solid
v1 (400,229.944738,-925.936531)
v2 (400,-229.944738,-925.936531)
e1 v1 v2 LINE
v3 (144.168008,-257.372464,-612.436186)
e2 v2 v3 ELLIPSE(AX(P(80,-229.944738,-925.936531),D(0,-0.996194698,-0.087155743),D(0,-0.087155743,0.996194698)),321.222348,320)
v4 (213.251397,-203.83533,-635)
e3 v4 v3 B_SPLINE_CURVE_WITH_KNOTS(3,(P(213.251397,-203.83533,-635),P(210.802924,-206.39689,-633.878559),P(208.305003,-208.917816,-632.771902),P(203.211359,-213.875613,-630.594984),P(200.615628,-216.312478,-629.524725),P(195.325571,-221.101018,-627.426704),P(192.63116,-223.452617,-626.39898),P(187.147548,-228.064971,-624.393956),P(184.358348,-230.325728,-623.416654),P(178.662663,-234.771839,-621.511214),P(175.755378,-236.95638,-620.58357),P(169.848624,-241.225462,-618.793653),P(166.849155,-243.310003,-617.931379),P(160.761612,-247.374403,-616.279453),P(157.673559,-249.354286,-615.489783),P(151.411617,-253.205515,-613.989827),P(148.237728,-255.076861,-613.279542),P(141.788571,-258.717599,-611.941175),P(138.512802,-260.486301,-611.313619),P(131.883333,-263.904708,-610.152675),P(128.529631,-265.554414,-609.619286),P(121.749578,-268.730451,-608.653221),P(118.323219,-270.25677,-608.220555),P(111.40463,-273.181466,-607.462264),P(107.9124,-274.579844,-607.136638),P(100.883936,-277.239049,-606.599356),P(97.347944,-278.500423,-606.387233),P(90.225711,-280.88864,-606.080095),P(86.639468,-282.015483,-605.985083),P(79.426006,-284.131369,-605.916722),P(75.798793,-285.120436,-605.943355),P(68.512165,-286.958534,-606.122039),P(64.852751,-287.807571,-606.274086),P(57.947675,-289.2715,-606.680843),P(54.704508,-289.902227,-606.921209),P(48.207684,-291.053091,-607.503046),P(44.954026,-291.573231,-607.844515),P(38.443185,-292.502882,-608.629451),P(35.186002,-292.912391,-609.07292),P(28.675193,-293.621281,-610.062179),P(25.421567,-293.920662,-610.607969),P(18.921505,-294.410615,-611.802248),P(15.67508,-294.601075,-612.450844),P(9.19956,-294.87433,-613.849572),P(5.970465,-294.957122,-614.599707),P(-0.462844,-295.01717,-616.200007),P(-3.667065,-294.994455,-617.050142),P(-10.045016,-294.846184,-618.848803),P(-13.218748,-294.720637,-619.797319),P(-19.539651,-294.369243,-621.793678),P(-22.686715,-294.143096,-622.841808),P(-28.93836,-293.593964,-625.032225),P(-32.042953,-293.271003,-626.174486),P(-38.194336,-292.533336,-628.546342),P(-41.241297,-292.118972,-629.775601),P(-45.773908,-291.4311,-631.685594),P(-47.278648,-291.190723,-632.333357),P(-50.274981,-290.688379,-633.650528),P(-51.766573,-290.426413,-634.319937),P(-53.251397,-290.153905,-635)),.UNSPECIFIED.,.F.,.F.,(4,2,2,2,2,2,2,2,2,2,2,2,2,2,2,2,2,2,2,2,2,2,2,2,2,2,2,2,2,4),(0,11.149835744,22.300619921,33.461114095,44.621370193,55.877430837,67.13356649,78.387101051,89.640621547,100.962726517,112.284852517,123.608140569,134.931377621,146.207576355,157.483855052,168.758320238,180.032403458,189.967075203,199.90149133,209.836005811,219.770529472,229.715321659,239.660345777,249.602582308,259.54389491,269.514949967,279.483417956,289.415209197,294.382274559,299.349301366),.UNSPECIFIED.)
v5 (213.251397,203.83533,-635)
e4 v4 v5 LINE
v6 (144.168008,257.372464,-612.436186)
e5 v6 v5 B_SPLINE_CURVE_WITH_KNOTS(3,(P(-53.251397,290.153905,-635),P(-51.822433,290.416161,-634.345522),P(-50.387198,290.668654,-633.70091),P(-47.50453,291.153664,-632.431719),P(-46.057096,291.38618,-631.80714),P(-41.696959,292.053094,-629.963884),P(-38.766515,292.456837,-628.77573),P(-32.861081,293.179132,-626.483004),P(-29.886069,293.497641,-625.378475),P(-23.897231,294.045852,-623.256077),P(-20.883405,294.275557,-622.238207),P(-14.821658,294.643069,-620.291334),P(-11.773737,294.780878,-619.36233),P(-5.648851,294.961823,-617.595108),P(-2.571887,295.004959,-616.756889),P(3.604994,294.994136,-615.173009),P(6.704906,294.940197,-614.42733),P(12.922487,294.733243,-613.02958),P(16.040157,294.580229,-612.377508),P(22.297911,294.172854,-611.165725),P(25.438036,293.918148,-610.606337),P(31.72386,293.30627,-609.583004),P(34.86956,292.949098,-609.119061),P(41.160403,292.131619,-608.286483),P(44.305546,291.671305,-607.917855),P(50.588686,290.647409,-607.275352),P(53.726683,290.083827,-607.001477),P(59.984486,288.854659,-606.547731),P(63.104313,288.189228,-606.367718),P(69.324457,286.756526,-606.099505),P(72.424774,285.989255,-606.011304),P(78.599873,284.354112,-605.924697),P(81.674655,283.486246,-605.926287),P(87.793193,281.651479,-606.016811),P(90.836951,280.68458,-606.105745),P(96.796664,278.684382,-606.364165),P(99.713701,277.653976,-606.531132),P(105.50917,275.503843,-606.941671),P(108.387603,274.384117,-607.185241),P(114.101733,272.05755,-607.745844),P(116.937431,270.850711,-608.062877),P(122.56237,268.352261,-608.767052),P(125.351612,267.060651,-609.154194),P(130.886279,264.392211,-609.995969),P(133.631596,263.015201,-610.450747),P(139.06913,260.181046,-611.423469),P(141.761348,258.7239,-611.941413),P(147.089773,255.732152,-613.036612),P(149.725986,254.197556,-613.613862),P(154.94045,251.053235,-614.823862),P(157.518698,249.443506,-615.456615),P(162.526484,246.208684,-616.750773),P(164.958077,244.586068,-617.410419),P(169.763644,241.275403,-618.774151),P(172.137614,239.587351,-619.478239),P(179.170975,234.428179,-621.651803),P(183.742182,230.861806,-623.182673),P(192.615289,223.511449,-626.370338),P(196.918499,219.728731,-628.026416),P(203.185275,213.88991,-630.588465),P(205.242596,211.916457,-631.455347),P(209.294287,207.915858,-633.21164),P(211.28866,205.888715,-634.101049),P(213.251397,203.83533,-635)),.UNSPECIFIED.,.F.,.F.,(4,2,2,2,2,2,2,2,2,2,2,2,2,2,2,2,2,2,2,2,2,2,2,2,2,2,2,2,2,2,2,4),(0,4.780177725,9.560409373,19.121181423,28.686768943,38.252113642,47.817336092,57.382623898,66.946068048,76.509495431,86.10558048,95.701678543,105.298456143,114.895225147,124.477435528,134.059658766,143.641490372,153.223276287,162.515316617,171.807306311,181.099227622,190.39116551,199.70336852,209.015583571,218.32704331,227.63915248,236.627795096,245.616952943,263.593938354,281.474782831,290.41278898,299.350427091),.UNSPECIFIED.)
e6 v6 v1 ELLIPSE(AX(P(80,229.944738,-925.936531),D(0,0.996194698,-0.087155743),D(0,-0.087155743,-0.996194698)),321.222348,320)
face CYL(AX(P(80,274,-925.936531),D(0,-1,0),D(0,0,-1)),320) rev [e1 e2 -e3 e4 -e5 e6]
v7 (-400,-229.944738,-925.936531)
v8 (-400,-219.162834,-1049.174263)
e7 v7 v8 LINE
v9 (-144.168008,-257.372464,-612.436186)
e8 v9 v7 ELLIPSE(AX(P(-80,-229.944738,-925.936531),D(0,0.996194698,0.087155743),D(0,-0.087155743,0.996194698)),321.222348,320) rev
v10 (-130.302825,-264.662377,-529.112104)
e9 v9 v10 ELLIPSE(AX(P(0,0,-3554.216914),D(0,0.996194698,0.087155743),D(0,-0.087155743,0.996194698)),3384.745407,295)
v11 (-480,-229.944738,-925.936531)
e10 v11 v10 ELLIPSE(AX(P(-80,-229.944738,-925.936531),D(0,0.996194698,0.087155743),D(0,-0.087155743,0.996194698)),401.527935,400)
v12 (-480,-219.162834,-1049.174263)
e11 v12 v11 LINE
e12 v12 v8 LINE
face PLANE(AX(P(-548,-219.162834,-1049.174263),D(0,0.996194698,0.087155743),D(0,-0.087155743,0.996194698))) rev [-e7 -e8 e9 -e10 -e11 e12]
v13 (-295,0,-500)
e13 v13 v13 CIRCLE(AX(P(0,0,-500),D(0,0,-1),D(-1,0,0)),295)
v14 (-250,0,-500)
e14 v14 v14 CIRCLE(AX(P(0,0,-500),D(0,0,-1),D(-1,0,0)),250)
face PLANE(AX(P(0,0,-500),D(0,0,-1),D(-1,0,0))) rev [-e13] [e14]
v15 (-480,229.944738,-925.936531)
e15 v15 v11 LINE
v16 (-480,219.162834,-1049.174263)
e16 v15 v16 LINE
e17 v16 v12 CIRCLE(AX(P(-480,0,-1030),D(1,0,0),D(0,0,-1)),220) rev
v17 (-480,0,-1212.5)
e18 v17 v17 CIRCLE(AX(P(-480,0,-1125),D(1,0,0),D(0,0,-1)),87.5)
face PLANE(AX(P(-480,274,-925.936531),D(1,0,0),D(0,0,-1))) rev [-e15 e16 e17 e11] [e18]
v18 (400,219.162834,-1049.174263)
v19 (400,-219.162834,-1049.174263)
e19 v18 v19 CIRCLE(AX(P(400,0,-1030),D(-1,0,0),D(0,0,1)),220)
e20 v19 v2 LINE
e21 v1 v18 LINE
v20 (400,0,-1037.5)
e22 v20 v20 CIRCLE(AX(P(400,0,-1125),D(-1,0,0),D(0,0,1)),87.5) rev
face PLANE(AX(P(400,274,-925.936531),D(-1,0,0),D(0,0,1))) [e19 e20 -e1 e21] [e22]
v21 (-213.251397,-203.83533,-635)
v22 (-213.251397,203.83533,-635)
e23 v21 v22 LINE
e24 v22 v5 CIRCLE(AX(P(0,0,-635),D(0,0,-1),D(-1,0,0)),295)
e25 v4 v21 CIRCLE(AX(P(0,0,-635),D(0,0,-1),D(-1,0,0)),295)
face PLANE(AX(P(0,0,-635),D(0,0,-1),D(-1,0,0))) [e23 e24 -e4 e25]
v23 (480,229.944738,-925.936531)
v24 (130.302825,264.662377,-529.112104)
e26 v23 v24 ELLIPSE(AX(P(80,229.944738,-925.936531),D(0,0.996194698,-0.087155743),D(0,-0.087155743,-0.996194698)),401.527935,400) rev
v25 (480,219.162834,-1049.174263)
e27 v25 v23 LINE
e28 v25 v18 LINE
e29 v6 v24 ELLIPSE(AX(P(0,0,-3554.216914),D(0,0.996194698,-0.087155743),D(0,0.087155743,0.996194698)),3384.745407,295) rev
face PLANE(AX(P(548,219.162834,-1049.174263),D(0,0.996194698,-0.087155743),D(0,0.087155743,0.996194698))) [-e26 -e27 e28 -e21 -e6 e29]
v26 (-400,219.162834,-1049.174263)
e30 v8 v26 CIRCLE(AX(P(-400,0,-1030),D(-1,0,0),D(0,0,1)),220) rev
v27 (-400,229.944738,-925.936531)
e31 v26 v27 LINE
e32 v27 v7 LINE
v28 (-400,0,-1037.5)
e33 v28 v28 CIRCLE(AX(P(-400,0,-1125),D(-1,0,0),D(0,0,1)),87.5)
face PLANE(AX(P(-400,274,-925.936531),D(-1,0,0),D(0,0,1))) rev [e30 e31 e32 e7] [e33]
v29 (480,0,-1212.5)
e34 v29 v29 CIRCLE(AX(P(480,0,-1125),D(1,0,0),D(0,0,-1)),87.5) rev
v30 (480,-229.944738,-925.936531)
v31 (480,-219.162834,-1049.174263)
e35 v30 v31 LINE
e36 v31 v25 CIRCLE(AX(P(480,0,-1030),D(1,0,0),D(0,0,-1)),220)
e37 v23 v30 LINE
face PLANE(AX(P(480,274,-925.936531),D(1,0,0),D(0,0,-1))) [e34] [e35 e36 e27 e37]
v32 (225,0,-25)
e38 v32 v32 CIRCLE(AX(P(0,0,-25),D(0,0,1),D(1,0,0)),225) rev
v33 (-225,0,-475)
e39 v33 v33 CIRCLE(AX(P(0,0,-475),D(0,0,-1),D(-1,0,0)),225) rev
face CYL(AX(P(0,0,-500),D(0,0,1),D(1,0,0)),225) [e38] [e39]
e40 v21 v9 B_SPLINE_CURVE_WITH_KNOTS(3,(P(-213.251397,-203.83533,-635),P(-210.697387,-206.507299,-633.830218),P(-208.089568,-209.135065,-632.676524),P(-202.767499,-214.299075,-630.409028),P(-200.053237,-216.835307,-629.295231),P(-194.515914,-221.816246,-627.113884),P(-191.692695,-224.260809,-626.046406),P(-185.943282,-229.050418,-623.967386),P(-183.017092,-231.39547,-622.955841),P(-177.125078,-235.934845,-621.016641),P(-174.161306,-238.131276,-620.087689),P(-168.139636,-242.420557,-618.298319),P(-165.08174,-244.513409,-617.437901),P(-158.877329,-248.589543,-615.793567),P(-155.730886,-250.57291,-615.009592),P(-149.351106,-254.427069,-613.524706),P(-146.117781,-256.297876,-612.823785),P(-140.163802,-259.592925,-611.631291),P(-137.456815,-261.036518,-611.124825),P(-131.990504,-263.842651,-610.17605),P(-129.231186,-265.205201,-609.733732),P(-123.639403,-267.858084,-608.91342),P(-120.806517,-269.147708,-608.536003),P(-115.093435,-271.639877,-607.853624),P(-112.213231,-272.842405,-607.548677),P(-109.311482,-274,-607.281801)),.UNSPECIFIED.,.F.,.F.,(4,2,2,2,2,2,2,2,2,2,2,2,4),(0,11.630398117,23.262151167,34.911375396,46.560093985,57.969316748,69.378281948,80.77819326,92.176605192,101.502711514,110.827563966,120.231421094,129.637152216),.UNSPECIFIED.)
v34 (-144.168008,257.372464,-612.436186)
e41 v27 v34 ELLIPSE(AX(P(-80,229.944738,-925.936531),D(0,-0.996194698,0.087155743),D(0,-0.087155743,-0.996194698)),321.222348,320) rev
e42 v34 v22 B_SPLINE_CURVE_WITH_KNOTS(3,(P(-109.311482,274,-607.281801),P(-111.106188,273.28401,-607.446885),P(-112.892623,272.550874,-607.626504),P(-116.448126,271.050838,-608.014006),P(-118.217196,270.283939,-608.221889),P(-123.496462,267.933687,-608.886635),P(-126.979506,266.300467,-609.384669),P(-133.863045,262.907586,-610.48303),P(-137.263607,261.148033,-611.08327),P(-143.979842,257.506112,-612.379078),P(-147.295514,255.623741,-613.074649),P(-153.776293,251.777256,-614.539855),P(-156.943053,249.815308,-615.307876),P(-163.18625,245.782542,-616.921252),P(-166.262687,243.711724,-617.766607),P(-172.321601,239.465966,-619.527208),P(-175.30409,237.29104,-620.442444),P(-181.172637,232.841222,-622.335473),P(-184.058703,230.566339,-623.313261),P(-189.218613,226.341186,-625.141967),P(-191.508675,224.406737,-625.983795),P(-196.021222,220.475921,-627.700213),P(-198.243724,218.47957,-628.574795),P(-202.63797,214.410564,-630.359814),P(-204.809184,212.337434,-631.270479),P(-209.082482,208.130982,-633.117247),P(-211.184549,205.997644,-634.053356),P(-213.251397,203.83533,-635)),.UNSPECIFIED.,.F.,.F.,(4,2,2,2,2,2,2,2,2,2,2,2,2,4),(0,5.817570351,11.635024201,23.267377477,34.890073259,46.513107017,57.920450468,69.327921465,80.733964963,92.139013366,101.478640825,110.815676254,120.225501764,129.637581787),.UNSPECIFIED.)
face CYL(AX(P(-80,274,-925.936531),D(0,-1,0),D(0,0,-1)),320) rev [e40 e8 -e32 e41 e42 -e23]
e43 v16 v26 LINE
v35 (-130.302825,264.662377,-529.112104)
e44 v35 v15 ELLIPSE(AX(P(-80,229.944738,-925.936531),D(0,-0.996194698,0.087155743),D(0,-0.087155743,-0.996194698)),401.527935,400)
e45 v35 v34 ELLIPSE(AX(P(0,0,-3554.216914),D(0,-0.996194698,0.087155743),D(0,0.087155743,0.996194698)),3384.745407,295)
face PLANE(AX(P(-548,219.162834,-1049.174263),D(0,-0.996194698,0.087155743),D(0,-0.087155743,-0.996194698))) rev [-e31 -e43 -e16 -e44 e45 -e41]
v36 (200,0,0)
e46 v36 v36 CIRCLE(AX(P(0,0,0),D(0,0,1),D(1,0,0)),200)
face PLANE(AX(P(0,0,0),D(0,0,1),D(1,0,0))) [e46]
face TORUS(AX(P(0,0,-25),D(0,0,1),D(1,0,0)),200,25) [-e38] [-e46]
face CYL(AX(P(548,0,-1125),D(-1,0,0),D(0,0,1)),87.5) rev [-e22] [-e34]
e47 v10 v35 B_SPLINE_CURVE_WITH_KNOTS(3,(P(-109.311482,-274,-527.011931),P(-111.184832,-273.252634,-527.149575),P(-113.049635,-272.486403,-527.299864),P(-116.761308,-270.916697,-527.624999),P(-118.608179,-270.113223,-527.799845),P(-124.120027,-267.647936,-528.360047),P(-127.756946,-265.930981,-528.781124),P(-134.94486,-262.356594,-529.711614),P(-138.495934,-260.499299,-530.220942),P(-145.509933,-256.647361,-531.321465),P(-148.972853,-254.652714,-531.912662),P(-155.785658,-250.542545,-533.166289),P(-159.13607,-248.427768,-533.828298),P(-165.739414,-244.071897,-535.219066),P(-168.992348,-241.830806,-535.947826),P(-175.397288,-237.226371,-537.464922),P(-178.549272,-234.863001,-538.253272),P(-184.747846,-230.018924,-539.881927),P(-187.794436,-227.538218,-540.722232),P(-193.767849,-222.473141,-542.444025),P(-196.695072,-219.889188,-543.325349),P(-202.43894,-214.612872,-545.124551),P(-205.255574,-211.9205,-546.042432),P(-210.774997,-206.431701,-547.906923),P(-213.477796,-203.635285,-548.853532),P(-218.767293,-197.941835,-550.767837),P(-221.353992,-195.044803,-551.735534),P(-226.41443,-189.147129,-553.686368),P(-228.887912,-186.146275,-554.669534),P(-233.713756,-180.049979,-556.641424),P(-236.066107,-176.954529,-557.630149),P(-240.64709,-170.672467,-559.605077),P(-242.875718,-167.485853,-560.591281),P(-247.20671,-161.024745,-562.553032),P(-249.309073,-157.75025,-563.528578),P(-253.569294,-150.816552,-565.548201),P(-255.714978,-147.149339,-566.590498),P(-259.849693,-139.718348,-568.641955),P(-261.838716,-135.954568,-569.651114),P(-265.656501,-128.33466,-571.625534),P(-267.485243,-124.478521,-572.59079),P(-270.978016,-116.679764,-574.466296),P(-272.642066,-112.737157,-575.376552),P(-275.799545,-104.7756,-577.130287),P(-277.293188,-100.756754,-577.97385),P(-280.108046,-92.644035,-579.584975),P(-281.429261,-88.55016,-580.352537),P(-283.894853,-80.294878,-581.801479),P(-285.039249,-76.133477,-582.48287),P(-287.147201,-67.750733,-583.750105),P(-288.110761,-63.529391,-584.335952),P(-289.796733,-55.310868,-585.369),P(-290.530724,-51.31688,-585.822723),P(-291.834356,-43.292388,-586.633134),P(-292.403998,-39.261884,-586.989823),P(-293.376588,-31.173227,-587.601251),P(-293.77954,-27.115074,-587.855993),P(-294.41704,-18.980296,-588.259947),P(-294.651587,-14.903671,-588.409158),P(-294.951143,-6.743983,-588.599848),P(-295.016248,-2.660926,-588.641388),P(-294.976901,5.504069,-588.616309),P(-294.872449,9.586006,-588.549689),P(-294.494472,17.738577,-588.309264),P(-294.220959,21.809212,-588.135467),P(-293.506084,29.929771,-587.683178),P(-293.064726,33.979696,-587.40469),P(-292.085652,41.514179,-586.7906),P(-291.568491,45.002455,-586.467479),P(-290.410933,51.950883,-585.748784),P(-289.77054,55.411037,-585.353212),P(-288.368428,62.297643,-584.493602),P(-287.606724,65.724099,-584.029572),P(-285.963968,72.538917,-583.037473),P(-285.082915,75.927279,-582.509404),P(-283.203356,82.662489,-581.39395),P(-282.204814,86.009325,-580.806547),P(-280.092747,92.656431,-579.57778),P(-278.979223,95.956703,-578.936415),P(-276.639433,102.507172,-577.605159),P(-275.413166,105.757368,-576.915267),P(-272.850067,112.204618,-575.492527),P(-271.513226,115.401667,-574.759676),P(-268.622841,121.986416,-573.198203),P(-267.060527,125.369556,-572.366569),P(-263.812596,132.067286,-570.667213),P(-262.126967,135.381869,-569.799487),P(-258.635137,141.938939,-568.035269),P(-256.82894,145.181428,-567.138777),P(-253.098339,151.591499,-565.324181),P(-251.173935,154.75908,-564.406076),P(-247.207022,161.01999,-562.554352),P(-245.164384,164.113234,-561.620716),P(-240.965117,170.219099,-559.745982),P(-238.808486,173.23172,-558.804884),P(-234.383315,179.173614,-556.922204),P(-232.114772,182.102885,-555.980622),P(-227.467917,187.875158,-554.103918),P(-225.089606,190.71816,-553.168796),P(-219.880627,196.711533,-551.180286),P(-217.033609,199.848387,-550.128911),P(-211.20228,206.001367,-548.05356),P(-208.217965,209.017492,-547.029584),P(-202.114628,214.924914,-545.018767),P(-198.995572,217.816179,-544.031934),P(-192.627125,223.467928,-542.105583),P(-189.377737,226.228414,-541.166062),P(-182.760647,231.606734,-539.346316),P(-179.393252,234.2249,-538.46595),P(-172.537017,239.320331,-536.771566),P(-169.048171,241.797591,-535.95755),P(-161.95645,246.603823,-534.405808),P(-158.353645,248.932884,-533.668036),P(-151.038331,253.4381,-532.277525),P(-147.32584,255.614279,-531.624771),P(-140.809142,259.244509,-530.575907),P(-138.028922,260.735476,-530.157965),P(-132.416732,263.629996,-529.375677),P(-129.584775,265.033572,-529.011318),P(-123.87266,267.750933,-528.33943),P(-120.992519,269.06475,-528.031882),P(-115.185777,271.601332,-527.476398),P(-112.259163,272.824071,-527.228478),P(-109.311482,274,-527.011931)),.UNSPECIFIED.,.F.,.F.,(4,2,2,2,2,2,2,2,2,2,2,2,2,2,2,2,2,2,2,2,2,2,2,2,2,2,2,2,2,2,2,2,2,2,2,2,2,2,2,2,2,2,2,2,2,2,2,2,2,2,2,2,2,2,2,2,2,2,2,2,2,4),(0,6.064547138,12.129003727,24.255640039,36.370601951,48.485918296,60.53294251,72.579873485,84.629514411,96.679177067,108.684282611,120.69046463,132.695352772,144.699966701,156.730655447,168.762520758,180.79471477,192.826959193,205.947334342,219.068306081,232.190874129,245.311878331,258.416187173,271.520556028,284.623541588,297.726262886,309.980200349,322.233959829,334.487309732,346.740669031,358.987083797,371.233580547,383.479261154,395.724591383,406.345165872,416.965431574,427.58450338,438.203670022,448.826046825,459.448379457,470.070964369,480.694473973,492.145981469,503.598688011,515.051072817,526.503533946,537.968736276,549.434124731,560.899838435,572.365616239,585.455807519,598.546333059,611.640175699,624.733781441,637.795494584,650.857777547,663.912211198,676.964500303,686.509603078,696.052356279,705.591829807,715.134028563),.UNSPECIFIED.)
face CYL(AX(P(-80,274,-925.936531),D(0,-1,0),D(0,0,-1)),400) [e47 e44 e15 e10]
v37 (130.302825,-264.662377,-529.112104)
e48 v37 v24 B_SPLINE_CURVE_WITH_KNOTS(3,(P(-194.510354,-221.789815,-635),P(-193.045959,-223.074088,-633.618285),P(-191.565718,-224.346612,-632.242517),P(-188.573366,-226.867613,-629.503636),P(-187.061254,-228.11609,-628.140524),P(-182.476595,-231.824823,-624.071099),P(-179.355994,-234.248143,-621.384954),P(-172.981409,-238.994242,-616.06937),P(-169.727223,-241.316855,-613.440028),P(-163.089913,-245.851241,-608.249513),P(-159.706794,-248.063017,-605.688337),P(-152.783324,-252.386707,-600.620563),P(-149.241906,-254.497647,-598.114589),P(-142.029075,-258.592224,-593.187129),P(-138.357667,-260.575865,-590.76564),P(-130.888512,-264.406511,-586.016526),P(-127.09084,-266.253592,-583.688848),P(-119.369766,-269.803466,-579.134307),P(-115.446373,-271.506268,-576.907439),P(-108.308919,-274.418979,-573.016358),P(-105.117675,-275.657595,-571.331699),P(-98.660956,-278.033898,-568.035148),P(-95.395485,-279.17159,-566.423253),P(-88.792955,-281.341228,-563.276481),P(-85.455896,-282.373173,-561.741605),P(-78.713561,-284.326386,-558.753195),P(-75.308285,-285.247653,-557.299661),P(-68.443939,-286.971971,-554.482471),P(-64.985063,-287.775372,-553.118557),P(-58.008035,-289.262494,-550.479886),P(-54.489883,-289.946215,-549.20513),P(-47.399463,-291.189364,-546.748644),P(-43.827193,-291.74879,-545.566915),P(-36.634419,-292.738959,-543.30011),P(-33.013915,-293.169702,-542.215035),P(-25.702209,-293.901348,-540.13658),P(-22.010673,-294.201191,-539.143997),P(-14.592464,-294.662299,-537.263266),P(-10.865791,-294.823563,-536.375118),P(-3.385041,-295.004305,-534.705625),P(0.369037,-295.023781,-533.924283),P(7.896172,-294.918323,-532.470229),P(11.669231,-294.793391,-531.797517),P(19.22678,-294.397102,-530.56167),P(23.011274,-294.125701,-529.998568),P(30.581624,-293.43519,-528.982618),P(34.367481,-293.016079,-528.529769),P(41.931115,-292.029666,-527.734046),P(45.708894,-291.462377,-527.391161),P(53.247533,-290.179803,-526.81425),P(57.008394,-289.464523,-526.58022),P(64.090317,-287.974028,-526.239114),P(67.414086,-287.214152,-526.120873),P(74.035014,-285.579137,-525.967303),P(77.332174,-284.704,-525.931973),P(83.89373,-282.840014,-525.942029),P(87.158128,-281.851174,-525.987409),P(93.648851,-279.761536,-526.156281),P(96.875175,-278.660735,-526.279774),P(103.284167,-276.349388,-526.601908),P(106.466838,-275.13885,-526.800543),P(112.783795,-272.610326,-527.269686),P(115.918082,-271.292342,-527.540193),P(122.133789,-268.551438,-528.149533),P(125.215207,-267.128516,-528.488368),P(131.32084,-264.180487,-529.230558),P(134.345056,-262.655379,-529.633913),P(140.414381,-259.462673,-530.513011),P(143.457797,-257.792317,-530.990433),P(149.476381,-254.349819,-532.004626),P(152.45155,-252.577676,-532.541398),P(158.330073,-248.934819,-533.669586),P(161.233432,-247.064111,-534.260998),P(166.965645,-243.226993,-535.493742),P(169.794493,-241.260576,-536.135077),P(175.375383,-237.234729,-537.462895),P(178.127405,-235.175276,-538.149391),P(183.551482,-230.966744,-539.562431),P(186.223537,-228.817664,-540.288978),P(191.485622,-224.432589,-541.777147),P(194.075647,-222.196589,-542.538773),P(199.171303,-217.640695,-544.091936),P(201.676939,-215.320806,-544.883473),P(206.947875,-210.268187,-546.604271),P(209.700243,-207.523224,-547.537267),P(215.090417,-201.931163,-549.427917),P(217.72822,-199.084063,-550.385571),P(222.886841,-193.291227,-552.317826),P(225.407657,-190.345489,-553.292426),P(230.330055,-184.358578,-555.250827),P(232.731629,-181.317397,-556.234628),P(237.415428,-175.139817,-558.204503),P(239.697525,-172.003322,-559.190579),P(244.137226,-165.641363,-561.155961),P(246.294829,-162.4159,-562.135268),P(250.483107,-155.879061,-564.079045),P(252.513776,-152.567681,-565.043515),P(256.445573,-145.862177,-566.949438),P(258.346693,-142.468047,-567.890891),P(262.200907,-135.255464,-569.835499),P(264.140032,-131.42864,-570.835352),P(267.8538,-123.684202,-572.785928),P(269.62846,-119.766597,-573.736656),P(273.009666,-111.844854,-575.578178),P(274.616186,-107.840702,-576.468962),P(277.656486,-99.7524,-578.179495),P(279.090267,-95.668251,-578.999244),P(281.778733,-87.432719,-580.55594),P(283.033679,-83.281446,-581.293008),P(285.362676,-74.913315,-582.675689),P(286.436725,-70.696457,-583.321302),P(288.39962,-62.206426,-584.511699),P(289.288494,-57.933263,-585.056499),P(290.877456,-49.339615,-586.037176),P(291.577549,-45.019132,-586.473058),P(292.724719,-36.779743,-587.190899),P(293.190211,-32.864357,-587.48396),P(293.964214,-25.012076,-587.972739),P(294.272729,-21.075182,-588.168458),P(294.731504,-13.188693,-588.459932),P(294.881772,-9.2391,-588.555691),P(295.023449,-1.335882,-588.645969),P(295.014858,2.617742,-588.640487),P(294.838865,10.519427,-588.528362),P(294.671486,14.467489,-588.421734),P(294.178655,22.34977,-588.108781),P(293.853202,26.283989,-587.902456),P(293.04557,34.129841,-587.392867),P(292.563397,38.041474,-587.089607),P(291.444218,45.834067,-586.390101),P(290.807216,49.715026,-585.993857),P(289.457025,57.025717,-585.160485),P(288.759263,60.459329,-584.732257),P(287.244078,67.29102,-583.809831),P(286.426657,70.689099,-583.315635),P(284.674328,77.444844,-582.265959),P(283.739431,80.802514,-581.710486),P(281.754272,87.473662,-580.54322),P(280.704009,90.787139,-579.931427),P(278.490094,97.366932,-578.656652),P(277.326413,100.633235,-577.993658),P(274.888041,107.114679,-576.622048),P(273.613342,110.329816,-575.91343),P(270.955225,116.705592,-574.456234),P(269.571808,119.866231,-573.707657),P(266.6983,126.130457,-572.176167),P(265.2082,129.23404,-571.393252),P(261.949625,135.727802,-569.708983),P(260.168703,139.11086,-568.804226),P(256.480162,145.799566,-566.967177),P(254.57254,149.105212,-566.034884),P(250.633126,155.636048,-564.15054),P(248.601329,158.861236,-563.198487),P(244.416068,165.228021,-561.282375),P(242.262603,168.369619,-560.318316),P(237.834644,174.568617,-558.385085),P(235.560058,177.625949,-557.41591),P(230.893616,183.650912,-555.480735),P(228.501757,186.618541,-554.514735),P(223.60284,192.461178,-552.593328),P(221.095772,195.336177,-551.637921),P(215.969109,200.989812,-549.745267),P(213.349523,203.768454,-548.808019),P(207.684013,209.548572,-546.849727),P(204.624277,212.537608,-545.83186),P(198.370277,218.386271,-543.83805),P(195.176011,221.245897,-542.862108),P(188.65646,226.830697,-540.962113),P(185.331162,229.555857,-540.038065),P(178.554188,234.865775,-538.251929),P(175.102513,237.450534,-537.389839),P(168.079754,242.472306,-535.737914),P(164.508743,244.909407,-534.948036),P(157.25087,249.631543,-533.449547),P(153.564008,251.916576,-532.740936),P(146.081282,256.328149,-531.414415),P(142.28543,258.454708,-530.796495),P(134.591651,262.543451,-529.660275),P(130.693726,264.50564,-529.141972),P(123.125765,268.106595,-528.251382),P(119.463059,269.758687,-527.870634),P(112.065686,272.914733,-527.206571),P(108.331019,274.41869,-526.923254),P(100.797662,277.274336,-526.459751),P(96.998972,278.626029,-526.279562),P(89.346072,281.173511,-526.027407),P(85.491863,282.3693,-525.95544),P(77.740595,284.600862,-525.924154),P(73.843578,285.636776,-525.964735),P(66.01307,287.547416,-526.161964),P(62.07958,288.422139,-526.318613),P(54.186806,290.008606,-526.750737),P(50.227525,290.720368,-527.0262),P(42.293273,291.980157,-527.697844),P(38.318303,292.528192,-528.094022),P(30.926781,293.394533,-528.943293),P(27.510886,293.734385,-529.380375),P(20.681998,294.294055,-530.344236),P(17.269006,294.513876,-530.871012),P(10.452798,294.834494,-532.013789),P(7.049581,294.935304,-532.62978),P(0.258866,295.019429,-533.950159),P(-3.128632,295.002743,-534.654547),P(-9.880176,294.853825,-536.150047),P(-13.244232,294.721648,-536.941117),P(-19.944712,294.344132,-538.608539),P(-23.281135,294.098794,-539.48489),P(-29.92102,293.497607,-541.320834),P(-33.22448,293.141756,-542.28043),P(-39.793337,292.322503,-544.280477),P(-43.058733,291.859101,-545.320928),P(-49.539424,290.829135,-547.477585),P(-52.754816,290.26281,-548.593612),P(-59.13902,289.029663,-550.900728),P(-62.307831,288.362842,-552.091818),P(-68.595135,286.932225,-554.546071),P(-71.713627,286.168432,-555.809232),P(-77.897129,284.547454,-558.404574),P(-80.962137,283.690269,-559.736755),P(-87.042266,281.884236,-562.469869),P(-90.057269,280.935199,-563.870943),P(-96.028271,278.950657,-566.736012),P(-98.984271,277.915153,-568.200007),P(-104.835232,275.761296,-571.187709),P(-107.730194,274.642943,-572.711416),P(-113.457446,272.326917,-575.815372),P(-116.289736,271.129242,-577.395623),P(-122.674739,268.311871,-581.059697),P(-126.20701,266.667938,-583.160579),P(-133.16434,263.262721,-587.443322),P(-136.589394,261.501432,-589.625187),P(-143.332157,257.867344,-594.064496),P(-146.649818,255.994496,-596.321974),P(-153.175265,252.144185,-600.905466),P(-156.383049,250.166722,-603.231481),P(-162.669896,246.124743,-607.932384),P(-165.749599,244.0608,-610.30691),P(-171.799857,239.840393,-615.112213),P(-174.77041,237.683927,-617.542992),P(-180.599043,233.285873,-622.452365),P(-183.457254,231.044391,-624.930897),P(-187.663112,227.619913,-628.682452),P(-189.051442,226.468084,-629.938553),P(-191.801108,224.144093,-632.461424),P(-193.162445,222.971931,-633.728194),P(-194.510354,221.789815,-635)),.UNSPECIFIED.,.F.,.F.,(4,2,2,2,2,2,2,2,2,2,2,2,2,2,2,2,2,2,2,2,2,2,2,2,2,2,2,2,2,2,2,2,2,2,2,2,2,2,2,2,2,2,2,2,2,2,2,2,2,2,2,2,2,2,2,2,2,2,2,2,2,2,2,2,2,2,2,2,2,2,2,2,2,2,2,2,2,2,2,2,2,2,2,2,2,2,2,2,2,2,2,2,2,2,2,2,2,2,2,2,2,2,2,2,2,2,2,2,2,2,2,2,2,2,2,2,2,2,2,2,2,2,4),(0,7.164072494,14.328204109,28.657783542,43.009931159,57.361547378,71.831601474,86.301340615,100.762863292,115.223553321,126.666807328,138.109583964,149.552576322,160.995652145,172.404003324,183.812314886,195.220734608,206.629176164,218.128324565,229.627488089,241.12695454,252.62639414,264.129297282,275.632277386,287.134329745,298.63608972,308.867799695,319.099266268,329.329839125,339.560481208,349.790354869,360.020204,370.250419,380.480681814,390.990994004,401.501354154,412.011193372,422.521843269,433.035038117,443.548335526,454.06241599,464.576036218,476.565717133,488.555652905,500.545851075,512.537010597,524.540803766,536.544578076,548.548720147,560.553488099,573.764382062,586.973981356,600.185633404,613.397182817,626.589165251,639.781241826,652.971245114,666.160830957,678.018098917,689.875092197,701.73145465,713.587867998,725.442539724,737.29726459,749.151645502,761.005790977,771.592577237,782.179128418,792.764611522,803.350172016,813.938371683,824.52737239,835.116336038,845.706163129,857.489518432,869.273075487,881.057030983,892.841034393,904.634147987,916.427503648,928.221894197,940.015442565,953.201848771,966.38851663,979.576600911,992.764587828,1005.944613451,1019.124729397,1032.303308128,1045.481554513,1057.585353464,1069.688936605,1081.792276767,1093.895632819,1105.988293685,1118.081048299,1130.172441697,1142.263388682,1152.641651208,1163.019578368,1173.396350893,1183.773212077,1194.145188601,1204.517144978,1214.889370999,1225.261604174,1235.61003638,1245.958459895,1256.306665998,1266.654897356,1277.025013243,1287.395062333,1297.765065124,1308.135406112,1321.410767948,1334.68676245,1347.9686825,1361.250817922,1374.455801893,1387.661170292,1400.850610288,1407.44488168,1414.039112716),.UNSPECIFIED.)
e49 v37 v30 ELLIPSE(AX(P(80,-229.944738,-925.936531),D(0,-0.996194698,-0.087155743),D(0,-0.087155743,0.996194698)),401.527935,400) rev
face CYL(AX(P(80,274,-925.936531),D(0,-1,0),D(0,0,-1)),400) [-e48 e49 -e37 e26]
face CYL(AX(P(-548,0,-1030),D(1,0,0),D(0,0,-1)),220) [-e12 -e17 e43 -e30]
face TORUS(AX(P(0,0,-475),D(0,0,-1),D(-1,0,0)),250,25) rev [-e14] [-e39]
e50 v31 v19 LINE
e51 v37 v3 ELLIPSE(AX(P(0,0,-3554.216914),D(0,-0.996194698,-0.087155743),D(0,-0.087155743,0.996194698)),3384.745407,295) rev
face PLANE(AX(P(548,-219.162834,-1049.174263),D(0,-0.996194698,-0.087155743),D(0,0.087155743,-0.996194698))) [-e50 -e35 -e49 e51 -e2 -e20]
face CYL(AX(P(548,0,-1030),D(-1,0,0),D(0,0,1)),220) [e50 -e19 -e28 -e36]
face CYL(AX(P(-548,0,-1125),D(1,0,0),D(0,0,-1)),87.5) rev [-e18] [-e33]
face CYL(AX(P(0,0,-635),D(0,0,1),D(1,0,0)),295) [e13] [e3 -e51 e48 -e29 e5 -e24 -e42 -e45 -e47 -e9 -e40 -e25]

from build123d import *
from build123d.topology import SkipClean

# Parameters (mm, degrees)
SKETCH1_R           = 225
BOSS_EXTRUDE1_DEPTH = 500
SKETCH2_R           = 295
BOSS_EXTRUDE2_DEPTH = 135
FILLET1_R           = 25
BOSS_EXTRUDE3_DEPTH = 274
SKETCH7_R           = 87.5
CUT_EXTRUDE1_DEPTH  = 548
SKETCH8_R           = 295
BOSS_EXTRUDE4_DEPTH = 135


with BuildPart() as part:
    # Sketch1 → Boss-Extrude1 (new body)
    with BuildSketch(Plane.XY):
        Circle(SKETCH1_R)
    extrude(amount=-BOSS_EXTRUDE1_DEPTH)

    # Sketch2 → Boss-Extrude2 (add)
    with BuildSketch(Plane(origin=(0, 0, -500), x_dir=(-1, 0, 0), z_dir=(0, 0, -1))):
        Circle(SKETCH2_R)
    extrude(amount=BOSS_EXTRUDE2_DEPTH)

    # Fillet1
    fillet1_edges = [part.edges().sort_by_distance(p)[0] for p in [
        (-225, 0, 0),
        (-225, 0, -500),
    ]]
    fillet(fillet1_edges, radius=FILLET1_R)

    # Sketch5 → Boss-Extrude3 (add, symmetric)
    with BuildSketch(Plane(origin=(0, 0, 0), x_dir=(1, 0, 0), z_dir=(0, 1, 0))):
        with BuildLine():
            Line((0, 525.936531369), (-80, 525.936531369))
            ThreePointArc((-80, 525.936531369), (-362.842712475, 643.093818894), (-480, 925.936531369))
            Line((-480, 925.936531369), (-480, 1250))
            Line((-480, 1250), (-400, 1250))
            Line((-400, 1250), (-400, 925.936531369))
            ThreePointArc((-400, 925.936531369), (-306.27416998, 699.662361389), (-80, 605.936531369))
            Line((-80, 605.936531369), (0, 605.936531369))
            Line((0, 605.936531369), (0, 525.936531369))
        make_face()
    boss_extrude3 = extrude(amount=BOSS_EXTRUDE3_DEPTH, both=True)

    # Sketch7 → Cut-Extrude1 (cut)
    with BuildSketch(Plane(origin=(0, 0, 0), x_dir=(0, 0, -1), z_dir=(1, 0, 0))):
        with Locations((1125, 0)):
            Circle(SKETCH7_R)
        with BuildLine():
            Line((1049.174263404, 219.16283358), (203.039318936, 293.190049034))
            Line((203.039318936, 293.190049034), (290.021270447, 513.829798209))
            Line((290.021270447, 513.829798209), (1323.371387979, 627.428253954))
            Line((1323.371387979, 627.428253954), (2049.606507286, -712.594868551))
            Line((2049.606507286, -712.594868551), (1049.174263404, -1026.824287114))
            Line((1049.174263404, -1026.824287114), (203.039318936, -293.190049034))
            Line((203.039318936, -293.190049034), (1049.174263404, -219.16283358))
            ThreePointArc((1049.174263404, -219.16283358), (1250, 0), (1049.174263404, 219.16283358))
        make_face()
    cut_extrude1 = extrude(amount=-CUT_EXTRUDE1_DEPTH, mode=Mode.SUBTRACT)

    # Sketch8 → Boss-Extrude4 (add)
    with BuildSketch(Plane.XY.offset(-500)):
        with Locations(Location((0, 0, 0), (0, 0, 243.787314881))):
            Circle(SKETCH8_R)
    boss_extrude4 = extrude(amount=-BOSS_EXTRUDE4_DEPTH)

    # Mirror3: Boss-Extrude3, Cut-Extrude1, Boss-Extrude4 across plane
    with SkipClean():  # the faces are left unmerged after this step: merging them gives an invalid solid
        add(boss_extrude3.mirror(Plane(origin=(0, 0, 0), x_dir=(0, 0, 1), z_dir=(1, 0, 0))))
        add(cut_extrude1.mirror(Plane(origin=(0, 0, 0), x_dir=(0, 0, 1), z_dir=(1, 0, 0))), mode=Mode.SUBTRACT)
        add(boss_extrude4.mirror(Plane(origin=(0, 0, 0), x_dir=(0, 0, 1), z_dir=(1, 0, 0))))
    add(part.part.scale(1), mode=Mode.REPLACE)  # the faces are merged on a copy


solid = part.part
